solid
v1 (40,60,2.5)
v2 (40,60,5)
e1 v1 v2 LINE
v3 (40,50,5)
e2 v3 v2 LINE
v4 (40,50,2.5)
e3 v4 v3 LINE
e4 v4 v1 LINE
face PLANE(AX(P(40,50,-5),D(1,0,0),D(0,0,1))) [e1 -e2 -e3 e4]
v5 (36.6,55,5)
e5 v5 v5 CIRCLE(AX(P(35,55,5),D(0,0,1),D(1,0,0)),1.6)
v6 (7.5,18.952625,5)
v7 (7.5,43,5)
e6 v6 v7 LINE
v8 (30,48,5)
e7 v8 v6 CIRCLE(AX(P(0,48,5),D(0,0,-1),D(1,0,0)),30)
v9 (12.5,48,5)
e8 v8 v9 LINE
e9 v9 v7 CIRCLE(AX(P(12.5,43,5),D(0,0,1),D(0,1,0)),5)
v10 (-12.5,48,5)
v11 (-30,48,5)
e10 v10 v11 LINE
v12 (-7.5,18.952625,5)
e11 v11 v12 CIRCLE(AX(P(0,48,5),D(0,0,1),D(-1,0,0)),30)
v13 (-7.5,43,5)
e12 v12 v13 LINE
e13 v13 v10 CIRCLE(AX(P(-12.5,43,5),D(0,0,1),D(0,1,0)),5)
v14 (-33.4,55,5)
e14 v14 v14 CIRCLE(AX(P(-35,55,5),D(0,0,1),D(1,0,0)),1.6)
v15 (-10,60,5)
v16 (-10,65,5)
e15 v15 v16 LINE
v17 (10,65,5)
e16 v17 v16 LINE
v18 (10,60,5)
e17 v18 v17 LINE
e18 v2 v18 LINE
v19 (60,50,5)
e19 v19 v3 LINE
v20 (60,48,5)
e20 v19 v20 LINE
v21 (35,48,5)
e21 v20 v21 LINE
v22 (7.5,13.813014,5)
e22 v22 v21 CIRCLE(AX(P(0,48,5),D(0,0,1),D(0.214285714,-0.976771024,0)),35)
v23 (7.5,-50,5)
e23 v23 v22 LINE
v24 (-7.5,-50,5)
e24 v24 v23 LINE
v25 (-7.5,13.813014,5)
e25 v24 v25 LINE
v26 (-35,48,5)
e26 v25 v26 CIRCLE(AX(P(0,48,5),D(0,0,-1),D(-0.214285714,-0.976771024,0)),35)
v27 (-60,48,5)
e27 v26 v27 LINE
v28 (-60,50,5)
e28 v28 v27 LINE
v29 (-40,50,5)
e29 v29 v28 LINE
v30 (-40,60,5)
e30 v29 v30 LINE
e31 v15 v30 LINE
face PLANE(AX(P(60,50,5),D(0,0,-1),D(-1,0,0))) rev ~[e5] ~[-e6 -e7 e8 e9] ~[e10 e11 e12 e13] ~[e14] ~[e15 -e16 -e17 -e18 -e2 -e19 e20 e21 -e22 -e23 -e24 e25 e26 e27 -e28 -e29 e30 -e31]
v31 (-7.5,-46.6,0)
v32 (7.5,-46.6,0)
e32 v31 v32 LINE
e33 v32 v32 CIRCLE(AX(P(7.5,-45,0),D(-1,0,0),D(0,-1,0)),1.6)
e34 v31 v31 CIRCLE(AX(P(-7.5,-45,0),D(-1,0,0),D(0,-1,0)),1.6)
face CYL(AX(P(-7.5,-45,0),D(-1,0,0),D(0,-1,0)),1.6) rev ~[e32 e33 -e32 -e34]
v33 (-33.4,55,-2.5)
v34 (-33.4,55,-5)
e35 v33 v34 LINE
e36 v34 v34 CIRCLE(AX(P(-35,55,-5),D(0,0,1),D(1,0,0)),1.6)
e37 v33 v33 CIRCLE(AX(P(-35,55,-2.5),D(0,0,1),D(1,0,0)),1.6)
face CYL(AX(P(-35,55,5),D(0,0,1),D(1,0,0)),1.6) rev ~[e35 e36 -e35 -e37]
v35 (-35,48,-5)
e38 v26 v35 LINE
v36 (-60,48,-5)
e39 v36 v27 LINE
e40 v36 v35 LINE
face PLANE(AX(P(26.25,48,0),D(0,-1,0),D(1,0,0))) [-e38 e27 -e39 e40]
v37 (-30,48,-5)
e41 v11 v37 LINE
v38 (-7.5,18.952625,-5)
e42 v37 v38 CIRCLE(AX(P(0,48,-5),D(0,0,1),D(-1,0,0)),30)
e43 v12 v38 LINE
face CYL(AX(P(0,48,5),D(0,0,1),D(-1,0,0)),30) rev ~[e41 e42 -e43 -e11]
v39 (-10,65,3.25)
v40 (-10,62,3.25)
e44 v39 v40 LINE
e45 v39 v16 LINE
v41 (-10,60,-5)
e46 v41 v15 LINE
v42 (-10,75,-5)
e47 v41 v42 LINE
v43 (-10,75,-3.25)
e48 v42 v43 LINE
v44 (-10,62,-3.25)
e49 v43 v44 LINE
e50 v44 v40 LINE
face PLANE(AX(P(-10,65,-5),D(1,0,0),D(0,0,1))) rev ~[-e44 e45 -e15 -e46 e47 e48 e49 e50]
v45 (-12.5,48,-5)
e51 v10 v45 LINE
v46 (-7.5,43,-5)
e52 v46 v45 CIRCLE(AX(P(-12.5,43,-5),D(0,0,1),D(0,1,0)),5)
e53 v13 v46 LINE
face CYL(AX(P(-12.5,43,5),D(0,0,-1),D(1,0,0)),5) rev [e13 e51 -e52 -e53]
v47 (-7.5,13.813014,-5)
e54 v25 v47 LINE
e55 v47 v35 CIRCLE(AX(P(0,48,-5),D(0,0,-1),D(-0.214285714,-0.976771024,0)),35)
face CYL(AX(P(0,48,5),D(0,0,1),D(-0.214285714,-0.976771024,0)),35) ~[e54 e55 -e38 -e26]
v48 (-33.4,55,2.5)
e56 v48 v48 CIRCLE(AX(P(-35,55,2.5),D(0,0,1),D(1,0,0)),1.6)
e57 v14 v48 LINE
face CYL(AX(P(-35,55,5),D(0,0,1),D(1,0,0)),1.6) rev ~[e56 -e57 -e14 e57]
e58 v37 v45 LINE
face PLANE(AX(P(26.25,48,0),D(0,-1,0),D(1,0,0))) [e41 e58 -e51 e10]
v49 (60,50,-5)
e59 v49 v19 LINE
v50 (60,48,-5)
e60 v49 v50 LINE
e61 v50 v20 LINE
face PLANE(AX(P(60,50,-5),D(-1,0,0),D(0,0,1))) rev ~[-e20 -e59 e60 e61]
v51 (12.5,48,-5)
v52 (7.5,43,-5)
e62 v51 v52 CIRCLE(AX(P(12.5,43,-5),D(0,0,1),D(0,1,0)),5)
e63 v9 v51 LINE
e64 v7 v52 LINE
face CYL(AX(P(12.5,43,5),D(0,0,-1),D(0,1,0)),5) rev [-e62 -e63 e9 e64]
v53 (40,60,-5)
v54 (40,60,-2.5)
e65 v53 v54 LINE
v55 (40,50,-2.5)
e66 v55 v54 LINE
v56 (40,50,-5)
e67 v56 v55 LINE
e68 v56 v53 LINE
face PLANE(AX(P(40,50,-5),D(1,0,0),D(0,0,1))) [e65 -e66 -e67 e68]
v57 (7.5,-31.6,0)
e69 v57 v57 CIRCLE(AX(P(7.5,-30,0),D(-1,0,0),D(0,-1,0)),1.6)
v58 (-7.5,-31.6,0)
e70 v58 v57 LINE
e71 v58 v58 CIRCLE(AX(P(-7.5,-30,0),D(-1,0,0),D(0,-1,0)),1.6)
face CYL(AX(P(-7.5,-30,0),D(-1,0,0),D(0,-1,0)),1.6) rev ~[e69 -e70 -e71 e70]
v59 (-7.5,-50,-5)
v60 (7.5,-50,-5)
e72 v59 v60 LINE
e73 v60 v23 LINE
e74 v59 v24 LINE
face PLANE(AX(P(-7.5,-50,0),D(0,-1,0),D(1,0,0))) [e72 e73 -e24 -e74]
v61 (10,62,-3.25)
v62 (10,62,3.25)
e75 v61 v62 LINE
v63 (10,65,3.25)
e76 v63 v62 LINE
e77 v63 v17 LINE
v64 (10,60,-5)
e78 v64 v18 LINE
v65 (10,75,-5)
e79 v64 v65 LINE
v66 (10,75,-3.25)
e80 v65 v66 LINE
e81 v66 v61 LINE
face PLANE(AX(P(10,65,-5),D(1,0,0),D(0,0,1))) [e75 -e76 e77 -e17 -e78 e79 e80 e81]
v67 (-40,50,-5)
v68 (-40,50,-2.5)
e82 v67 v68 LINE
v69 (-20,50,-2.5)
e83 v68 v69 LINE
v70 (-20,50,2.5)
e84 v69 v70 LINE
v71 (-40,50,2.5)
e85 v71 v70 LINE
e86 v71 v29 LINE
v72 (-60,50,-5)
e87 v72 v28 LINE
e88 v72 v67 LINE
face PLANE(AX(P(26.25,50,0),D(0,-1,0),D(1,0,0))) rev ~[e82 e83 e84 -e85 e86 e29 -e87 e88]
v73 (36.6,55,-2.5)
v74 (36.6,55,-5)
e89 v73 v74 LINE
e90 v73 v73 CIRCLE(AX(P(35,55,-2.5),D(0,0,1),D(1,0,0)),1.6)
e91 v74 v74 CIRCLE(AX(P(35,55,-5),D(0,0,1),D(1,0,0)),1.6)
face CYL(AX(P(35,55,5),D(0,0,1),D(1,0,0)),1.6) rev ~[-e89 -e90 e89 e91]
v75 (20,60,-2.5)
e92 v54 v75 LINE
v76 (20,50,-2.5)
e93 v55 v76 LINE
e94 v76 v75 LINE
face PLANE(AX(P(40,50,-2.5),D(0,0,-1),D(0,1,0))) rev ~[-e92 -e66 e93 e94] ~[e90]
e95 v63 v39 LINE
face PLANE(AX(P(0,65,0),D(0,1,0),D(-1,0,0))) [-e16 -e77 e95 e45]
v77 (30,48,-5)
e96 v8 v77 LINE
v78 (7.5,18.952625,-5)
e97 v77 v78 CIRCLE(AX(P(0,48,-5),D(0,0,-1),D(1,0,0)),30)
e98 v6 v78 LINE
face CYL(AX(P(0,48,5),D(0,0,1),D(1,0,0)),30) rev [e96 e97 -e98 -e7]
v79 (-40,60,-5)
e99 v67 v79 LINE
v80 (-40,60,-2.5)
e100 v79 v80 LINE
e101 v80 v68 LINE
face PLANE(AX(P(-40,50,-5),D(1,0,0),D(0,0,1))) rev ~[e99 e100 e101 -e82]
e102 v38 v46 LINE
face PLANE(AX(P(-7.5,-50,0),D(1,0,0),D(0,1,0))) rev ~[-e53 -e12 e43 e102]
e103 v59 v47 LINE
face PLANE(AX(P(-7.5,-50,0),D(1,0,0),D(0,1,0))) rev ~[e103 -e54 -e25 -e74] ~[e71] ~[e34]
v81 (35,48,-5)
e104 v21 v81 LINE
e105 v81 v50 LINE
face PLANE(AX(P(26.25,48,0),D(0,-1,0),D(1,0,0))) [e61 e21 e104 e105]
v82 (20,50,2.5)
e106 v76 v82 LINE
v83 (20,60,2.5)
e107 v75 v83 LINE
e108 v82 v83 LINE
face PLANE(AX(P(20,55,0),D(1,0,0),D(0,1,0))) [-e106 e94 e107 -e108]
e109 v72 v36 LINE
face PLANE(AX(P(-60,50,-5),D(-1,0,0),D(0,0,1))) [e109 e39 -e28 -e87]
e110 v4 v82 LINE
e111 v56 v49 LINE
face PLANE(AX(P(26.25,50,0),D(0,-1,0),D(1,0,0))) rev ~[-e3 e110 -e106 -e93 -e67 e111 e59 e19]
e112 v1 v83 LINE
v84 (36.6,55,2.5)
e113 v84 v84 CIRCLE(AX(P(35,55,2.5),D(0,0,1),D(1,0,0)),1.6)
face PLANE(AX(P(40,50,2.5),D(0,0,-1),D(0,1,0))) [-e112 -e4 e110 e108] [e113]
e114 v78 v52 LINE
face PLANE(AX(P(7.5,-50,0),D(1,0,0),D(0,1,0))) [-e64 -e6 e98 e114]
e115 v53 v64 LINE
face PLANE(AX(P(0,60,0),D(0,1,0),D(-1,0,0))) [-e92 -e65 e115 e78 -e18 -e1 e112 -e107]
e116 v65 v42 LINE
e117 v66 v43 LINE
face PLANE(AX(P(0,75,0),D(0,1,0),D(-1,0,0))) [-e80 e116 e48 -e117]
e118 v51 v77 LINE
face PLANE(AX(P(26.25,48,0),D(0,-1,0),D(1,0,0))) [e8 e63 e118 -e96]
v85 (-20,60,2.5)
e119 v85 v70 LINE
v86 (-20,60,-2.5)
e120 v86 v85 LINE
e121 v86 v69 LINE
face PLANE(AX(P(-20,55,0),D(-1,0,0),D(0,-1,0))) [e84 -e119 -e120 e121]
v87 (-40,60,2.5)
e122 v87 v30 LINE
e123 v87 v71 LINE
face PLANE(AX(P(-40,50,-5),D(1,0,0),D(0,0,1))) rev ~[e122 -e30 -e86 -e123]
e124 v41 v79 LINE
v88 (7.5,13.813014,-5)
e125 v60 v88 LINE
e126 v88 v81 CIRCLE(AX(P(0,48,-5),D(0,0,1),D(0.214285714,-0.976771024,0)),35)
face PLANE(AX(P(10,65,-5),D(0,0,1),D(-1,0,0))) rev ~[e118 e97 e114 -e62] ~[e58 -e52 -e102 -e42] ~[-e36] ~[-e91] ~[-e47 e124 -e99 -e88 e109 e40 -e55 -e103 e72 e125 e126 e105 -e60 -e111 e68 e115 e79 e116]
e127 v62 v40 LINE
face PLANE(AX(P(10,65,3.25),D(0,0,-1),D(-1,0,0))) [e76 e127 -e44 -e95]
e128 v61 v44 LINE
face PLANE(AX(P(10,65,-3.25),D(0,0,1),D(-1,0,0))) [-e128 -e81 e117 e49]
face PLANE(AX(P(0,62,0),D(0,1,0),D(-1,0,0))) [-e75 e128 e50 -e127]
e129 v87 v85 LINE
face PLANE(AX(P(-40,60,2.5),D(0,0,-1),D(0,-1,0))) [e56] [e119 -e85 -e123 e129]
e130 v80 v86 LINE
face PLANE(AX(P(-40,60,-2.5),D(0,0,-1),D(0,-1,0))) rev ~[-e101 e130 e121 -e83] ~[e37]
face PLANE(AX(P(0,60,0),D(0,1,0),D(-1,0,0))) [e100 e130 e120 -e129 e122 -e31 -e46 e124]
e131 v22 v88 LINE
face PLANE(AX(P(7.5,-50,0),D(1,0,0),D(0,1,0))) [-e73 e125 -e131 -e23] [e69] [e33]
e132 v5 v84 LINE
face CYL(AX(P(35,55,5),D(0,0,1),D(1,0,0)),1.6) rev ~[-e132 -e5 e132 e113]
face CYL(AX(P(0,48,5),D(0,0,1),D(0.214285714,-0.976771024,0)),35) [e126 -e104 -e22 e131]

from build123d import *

# Parameters (mm, degrees)
F0_W      = 15
F0_H      = 100
F1_DEPTH  = 5
F2_W      = 80
F2_H      = 10
F3_DEPTH  = 10
F4_W      = 10
F4_H      = 5
F5_DEPTH  = 20
F6_W      = 10
F6_H      = 5
F7_DEPTH  = 20
F8_R      = 1.6
F9_DEPTH  = 10
F10_W     = 67.5
F10_H     = 10
F10_W_2   = 120
F11_DEPTH = 2
F12_R     = 5
F13_R     = 1.6
F14_DEPTH = 15
F15_W     = 20
F15_H     = 10
F16_DEPTH = 5
F17_W     = 20
F17_H     = 6.5
F18_DEPTH = 3
F19_DEPTH = 10
F21_DEPTH = 10


# Not quite as in the source:
# - a pattern or mirror of a feature is missing from the dataset's text; its kind, count and spacing are read off the source's solid


with BuildPart() as f1:
    # F0 (on Top) → F1 (new body, symmetric)
    with BuildSketch(Plane.XY):
        Rectangle(F0_W, F0_H)
    extrude(amount=F1_DEPTH, both=True)

    # F2 (on face) → F3 (join)
    with BuildSketch(Plane(origin=(0, 50, 0), x_dir=(-1, 0, 0), z_dir=(0, 1, 0))):
        Rectangle(F2_W, F2_H)
    extrude(amount=F3_DEPTH)

    # F4 (on face) → F5 (cut)
    with BuildSketch(Plane(origin=(-40, 0, 0), x_dir=(0, -1, 0), z_dir=(-1, 0, 0))):
        with Locations((-55, 0)):
            Rectangle(F4_W, F4_H)
    extrude(amount=-F5_DEPTH, mode=Mode.SUBTRACT)

    # F6 (on face) → F7 (cut)
    with BuildSketch(Plane.YZ.offset(40)):
        with Locations((55, 0)):
            Rectangle(F6_W, F6_H)
    extrude(amount=-F7_DEPTH, mode=Mode.SUBTRACT)

    # F8 (on face) → F9 (cut, through all)
    with BuildSketch(Plane.XY.offset(5)):
        with Locations((-35, 55)):
            Circle(F8_R)
        with Locations((35, 55)):
            Circle(F8_R)
    extrude(amount=-F9_DEPTH, mode=Mode.SUBTRACT)

    # F10 (on face) → F11 (join)
    with BuildSketch(Plane.XZ.offset(-50)):
        with Locations((26.25, 0)):
            Rectangle(F10_W, F10_H)
        Rectangle(F10_W_2, F10_H)
    extrude(amount=F11_DEPTH)

    # F12
    f12_edges = [f1.edges().sort_by_distance(p)[0] for p in [
        (-7.5, 48, 0),
        (7.5, 48, 0),
    ]]
    fillet(f12_edges, radius=F12_R)

    # F13 (on face) → F14 (cut, through all)
    with BuildSketch(Plane(origin=(-7.5, 0, 0), x_dir=(0, -1, 0), z_dir=(-1, 0, 0))):
        with Locations((30, 0)):
            Circle(F13_R)
        with Locations((45, 0)):
            Circle(F13_R)
    extrude(amount=-F14_DEPTH, mode=Mode.SUBTRACT)

    # F15 (on face) → F16 (join)
    with BuildSketch(Plane(origin=(0, 60, 0), x_dir=(-1, 0, 0), z_dir=(0, 1, 0))):
        Rectangle(F15_W, F15_H)
    extrude(amount=F16_DEPTH)

    # F17 (on face) → F18 (cut)
    with BuildSketch(Plane(origin=(0, 65, 0), x_dir=(-1, 0, 0), z_dir=(0, 1, 0))):
        Rectangle(F17_W, F17_H)
    extrude(amount=-F18_DEPTH, mode=Mode.SUBTRACT)

    # F19 (add): a face of the model
    f19_faces = [f1.faces().sort_by_distance(p)[0] for p in [
        (0, 65, -4.125),
    ]]
    extrude(f19_faces, amount=F19_DEPTH)

    # F20 (on face) → F21 (join, through all)
    with BuildSketch(Plane.XY.offset(5)):
        with BuildLine():
            Line((35, 48), (30, 48))
            ThreePointArc((30, 48), (23.7170824513, 29.6288269291), (7.5, 18.9526249034))
            Line((7.5, 18.9526249034), (7.5, 13.8130141721))
            ThreePointArc((7.5, 13.8130141721), (27.2717802866, 26.0625890315), (35, 48))
        make_face()
    f21 = extrude(amount=-F21_DEPTH)

    # F21_copies: F21 across plane
    add(f21.mirror(Plane(origin=(0, 0, 0), x_dir=(0, 0, -1), z_dir=(-1, 0, 0))))


solid = f1.part
